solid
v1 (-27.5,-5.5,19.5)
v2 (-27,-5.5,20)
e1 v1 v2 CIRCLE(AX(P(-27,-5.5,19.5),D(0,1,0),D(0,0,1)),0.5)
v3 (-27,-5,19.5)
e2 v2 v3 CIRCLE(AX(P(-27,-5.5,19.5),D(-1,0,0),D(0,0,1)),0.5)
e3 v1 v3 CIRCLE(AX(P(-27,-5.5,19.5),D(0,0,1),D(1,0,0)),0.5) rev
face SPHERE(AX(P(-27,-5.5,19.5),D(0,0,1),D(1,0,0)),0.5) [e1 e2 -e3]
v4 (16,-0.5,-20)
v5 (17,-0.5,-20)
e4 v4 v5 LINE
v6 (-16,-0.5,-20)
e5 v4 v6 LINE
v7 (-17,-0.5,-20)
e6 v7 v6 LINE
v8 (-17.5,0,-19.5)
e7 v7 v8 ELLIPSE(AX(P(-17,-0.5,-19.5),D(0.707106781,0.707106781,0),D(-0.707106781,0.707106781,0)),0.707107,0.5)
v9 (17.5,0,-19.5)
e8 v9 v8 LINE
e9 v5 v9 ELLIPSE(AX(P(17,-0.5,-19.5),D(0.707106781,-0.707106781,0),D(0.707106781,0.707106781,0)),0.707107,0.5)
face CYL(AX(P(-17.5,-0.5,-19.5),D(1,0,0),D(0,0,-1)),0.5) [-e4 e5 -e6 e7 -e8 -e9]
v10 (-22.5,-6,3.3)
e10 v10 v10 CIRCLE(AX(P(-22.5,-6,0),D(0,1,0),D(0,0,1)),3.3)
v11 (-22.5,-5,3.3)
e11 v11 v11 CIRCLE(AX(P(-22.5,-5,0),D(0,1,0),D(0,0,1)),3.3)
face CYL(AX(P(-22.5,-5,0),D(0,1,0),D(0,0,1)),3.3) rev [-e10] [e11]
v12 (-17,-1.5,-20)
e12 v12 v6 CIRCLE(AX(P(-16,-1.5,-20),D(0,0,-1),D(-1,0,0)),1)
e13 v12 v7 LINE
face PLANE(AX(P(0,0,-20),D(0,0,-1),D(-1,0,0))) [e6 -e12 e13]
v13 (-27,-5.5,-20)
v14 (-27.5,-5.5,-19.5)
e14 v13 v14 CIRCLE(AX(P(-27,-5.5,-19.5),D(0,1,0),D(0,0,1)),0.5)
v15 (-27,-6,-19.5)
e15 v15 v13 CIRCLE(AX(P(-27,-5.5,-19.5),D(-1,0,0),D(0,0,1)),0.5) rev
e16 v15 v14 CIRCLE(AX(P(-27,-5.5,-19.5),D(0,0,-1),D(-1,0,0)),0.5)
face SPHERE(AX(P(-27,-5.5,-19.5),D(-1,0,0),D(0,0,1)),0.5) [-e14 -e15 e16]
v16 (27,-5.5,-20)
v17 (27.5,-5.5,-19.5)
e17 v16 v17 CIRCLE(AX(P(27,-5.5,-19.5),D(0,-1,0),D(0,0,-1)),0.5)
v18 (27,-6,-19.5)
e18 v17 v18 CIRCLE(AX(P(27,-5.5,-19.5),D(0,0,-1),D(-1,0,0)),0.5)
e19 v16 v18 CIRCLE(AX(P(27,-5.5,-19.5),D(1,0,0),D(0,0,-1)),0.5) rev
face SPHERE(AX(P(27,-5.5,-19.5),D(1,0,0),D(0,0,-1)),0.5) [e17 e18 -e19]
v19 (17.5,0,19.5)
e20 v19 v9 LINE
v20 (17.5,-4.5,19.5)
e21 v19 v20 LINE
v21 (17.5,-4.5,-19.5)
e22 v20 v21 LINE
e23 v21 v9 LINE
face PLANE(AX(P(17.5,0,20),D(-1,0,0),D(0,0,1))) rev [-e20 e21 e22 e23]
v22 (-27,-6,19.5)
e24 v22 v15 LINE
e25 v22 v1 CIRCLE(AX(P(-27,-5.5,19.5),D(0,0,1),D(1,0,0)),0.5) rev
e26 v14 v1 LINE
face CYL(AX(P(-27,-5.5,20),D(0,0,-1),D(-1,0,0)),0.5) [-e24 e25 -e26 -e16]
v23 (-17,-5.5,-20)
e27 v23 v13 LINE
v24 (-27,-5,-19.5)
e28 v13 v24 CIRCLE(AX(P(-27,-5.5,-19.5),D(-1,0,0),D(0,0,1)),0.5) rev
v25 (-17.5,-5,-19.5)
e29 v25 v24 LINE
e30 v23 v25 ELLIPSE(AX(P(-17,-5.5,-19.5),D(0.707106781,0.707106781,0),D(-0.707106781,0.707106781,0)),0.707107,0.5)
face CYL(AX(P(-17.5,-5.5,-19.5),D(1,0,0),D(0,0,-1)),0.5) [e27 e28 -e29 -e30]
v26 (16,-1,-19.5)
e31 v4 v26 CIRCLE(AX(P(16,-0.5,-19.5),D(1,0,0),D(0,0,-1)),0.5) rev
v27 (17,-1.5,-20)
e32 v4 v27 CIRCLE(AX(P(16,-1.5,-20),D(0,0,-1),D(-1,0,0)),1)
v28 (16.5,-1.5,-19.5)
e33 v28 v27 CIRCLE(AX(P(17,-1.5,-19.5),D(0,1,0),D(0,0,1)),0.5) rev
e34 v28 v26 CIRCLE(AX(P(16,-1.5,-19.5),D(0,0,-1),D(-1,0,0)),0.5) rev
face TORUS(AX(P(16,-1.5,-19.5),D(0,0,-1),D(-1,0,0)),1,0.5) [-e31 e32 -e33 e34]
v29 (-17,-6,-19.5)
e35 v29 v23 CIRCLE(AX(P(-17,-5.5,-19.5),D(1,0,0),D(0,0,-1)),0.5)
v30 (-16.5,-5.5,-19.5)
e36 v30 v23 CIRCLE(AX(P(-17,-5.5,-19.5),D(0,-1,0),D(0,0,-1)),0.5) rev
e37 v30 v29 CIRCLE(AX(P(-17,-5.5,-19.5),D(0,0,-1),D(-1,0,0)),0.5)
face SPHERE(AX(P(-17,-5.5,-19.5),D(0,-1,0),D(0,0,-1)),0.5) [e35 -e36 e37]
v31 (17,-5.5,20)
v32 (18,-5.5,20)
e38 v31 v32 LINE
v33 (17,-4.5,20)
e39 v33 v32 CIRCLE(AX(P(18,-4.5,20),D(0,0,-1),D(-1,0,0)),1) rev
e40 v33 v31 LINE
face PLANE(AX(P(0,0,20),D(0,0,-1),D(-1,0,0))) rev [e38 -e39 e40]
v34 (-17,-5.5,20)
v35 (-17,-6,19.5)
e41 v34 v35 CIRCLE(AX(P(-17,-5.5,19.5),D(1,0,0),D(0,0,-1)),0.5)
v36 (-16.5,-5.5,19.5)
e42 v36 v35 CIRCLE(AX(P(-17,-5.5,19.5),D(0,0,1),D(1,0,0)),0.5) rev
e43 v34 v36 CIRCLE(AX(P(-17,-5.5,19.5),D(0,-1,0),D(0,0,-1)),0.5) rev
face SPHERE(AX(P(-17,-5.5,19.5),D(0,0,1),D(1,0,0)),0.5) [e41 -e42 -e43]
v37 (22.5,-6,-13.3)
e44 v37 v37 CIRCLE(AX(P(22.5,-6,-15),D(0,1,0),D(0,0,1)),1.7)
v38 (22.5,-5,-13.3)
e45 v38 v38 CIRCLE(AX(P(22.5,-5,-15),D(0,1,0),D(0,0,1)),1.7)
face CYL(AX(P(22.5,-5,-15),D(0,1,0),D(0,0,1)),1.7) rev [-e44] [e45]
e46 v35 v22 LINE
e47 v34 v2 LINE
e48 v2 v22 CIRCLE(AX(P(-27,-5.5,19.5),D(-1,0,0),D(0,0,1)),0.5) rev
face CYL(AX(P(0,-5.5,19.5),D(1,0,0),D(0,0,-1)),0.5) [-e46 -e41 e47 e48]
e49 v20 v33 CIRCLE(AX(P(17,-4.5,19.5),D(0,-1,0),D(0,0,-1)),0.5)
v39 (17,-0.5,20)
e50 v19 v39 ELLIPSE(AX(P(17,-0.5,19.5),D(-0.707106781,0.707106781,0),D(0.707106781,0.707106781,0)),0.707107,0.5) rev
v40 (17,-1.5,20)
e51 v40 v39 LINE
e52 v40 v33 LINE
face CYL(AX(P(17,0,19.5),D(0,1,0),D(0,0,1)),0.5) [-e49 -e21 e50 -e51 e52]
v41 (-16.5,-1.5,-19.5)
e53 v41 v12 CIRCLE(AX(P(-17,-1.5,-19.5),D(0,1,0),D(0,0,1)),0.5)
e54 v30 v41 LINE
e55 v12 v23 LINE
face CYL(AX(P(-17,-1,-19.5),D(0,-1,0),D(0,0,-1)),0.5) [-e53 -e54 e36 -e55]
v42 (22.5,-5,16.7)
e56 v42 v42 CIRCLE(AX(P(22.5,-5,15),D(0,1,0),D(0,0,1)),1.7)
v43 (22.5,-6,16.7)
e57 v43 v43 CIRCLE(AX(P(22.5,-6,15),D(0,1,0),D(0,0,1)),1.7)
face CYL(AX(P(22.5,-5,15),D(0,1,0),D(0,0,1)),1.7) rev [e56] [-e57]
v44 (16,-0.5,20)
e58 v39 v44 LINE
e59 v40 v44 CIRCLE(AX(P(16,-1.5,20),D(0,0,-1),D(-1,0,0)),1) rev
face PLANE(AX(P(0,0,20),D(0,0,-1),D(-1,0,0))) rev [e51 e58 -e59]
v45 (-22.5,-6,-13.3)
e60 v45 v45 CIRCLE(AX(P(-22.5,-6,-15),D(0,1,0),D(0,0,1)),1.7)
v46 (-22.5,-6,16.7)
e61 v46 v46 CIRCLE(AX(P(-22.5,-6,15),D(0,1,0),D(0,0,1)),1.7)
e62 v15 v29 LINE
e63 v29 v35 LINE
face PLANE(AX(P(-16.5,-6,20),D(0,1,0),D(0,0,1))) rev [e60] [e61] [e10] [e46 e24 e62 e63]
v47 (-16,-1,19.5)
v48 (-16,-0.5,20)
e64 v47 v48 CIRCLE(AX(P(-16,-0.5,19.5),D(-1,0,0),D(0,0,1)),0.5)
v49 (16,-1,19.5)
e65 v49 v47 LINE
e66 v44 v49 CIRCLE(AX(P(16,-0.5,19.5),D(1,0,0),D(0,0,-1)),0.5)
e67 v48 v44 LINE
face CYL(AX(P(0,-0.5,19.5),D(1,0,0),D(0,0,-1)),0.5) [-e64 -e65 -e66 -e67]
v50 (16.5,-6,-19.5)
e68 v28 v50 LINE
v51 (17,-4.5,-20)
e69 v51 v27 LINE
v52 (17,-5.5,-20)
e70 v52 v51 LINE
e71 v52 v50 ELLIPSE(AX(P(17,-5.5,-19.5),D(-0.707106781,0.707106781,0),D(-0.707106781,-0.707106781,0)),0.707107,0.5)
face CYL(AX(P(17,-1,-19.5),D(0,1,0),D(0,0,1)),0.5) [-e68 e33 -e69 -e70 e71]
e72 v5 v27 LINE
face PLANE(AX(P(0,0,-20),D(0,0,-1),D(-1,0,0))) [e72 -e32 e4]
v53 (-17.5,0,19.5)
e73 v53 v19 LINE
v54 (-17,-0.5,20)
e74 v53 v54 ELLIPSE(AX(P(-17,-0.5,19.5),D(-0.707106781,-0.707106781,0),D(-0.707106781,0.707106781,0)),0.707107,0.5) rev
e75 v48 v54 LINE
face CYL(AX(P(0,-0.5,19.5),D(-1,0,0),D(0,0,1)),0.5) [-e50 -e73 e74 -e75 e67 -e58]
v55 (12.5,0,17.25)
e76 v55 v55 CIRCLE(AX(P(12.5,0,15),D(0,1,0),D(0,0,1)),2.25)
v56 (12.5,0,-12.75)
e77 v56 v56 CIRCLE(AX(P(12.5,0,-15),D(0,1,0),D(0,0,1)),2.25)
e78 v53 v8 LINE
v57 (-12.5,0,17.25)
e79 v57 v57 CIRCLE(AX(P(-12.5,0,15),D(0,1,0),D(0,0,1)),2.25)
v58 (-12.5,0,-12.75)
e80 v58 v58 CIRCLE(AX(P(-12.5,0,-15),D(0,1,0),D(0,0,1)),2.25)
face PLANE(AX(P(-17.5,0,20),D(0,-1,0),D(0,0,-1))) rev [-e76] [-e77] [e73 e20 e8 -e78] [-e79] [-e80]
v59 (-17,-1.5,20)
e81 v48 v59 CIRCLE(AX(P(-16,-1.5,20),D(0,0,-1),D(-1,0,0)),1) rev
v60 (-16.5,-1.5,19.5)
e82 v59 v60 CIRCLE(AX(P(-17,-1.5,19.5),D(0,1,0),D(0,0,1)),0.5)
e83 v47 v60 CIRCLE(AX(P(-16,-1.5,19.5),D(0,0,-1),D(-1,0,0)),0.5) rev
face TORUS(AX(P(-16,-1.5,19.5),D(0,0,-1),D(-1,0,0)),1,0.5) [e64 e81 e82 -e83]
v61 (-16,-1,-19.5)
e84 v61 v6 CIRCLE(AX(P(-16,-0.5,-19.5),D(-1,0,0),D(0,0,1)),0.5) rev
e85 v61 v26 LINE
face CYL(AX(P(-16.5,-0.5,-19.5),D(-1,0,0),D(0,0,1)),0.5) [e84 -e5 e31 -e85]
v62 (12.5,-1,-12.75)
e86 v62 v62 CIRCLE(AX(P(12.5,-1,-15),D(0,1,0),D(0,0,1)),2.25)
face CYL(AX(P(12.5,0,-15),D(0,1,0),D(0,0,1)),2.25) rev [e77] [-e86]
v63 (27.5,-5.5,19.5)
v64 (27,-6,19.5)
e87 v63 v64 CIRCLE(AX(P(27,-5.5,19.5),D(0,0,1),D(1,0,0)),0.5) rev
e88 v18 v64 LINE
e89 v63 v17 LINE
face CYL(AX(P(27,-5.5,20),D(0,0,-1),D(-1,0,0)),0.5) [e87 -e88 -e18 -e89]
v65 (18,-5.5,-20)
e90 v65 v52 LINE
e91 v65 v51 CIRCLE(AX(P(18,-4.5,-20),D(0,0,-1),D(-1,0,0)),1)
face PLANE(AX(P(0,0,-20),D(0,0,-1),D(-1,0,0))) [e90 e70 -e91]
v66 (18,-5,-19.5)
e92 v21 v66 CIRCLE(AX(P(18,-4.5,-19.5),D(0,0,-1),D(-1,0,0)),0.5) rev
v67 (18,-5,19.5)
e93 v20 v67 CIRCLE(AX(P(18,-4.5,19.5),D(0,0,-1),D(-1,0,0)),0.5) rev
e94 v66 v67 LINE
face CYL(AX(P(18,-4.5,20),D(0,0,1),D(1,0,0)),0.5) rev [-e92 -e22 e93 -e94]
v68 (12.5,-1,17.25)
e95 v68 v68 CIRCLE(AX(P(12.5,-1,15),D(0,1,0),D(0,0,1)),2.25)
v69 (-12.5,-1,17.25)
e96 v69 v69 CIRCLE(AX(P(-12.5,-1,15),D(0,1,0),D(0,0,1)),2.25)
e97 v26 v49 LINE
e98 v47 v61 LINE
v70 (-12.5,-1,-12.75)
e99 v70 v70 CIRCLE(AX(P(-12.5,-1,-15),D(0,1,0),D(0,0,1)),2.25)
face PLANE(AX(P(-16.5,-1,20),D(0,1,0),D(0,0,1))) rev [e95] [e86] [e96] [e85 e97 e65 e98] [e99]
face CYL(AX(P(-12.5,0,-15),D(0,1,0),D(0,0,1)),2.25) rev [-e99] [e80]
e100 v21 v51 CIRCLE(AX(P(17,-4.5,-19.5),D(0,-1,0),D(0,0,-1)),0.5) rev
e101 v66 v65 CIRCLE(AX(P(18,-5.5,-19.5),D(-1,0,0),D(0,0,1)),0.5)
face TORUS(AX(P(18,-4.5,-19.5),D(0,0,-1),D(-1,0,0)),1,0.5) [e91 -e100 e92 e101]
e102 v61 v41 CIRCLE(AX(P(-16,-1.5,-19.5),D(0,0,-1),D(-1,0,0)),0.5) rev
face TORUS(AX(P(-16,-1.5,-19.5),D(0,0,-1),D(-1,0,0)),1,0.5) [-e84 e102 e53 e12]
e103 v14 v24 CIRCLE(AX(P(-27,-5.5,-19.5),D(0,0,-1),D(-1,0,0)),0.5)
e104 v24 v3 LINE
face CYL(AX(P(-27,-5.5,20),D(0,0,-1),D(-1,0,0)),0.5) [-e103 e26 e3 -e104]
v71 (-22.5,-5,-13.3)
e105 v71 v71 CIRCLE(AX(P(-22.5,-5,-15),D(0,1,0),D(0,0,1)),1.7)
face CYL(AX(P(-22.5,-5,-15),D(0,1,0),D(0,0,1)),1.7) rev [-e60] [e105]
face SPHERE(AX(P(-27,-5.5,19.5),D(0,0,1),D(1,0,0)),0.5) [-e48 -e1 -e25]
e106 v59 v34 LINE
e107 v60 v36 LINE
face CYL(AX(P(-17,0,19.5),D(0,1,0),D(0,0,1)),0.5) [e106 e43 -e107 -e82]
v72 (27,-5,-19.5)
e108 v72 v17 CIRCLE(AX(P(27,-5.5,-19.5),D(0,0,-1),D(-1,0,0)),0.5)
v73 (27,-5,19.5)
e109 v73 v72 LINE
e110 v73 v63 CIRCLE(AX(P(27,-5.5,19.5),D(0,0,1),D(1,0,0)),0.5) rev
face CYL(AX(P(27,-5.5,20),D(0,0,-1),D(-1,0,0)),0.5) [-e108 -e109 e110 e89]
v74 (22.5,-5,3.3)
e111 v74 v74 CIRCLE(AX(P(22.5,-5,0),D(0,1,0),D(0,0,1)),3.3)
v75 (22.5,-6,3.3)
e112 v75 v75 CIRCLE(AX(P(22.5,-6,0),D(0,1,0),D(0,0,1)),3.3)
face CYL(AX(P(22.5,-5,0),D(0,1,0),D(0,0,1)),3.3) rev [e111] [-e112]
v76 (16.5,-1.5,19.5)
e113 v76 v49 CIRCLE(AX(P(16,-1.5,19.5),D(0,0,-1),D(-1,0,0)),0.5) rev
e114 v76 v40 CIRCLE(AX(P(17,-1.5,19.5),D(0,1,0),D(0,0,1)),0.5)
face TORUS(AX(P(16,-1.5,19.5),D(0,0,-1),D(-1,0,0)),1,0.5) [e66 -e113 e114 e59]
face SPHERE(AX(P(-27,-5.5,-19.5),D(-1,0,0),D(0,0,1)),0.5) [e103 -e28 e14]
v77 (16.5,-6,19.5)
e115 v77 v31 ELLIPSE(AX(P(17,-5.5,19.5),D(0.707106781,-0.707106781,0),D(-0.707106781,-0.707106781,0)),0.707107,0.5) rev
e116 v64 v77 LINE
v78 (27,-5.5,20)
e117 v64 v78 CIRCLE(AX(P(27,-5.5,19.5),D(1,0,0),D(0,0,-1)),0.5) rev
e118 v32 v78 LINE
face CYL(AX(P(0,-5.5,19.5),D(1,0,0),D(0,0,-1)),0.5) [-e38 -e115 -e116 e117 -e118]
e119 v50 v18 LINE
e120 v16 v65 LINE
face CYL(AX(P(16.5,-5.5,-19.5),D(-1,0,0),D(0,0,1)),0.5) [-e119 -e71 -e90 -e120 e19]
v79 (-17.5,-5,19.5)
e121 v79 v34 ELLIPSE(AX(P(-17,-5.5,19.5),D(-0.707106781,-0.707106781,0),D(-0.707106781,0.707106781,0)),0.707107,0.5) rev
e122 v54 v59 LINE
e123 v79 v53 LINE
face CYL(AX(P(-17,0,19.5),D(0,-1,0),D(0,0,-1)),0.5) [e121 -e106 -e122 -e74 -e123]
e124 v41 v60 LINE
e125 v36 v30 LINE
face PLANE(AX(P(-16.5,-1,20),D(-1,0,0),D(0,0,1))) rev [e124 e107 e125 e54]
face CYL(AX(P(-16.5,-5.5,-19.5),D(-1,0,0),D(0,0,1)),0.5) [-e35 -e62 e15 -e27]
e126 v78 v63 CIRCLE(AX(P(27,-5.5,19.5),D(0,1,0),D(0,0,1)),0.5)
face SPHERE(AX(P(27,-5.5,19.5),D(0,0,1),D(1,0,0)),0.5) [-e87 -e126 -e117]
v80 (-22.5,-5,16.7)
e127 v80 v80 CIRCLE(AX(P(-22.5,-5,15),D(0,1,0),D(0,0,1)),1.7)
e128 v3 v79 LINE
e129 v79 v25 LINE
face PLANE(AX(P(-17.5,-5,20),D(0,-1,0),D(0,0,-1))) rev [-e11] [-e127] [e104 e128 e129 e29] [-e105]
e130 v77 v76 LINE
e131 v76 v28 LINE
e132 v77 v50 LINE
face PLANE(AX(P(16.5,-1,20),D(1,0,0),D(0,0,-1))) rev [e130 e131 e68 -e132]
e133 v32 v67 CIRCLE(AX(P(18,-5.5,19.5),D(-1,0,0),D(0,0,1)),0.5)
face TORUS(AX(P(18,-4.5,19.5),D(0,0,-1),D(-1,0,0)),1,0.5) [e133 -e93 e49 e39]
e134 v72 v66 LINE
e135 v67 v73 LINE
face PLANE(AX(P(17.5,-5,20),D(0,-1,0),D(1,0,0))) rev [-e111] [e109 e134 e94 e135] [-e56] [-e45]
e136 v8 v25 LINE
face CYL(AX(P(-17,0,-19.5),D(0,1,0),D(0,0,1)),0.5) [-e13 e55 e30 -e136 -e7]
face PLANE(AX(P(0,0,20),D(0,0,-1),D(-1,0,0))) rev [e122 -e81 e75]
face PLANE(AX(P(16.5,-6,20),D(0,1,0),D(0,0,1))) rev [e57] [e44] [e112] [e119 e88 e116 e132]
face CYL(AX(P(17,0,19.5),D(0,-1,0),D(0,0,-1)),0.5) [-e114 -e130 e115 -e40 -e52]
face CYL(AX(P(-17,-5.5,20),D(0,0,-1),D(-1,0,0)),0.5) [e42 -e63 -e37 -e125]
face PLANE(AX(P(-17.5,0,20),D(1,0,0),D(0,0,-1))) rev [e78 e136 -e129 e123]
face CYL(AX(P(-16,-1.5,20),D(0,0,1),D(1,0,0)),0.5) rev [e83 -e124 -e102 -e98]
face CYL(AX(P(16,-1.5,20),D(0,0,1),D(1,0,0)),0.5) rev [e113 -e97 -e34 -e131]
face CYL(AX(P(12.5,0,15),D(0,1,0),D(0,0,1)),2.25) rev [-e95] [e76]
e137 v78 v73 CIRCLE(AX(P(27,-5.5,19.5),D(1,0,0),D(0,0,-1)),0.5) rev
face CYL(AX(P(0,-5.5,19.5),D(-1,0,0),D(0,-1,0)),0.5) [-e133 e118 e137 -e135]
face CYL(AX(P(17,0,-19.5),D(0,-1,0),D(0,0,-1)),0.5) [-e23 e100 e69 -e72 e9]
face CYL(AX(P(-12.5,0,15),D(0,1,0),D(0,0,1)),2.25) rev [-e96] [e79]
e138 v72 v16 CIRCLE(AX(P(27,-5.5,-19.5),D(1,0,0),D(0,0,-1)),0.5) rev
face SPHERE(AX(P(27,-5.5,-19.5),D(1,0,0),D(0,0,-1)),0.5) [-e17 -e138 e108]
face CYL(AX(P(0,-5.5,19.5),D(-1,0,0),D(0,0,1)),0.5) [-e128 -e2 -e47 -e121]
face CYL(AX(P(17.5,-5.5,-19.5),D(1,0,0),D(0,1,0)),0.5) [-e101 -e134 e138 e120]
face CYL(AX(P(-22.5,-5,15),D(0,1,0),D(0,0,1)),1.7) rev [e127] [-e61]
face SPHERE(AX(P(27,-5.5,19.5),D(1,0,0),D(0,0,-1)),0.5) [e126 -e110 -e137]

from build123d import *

# Parameters (mm, degrees)
BOSS_EXTRUDE1_DEPTH  = 20
FILLET1_R            = 0.5
M6_CLEARANCE_HOLE1_D = 6.6
M4_CLEARANCE_HOLE1_D = 4.5
M3_CLEARANCE_HOLE1_D = 3.4
MIRROR2_COPY_1_D     = 4.5
MIRROR2_COPY_2_D     = 3.4


with BuildPart() as part:
    # Sketch1 → Boss-Extrude1 (new, symmetric)
    with BuildSketch(Plane.XY):
        Polygon((-17.5, 0), (17.5, 0), (17.5, -5), (27.5, -5), (27.5, -6), (16.5, -6), (16.5, -1), (-16.5, -1), (-16.5, -6), (-27.5, -6), (-27.5, -5), (-17.5, -5), align=None)
    extrude(amount=BOSS_EXTRUDE1_DEPTH, both=True)

    # Fillet1
    fillet1_edges = [part.edges().sort_by_distance(p)[0] for p in [
        (27.5, -5.5, -20),
        (22, -6, -20),
        (0, 0, 20),
        (16.5, -3.5, -20),
        (0, -1, -20),
        (-16.5, -3.5, -20),
        (-22, -6, -20),
        (-27.5, -5.5, -20),
        (-22.5, -5, -20),
        (-17.5, -2.5, -20),
        (0, 0, -20),
        (17.5, -2.5, -20),
        (22.5, -5, -20),
        (-17.5, -2.5, 20),
        (27.5, -5, 0),
        (27.5, -6, 0),
        (-22.5, -5, 20),
        (16.5, -1, 0),
        (-16.5, -1, 0),
        (-16.5, -6, 0),
        (-27.5, -6, 0),
        (-27.5, -5, 0),
        (17.5, -5, 0),
        (-27.5, -5.5, 20),
        (-22, -6, 20),
        (-16.5, -3.5, 20),
        (0, -1, 20),
        (16.5, -3.5, 20),
        (22, -6, 20),
        (27.5, -5.5, 20),
        (22.5, -5, 20),
        (17.5, -2.5, 20),
    ]]
    fillet(fillet1_edges, radius=FILLET1_R - 0.0001)  # a hair under: the kernel refuses the full size

    # M6 Clearance Hole1 (through all)
    with Locations(Plane(origin=(0, -5, 0), x_dir=(1, 0, 0), z_dir=(0, 1, 0))):
        with Locations((-22.5, 0), (22.5, 0)):
            Hole(M6_CLEARANCE_HOLE1_D / 2)

    # M4 Clearance Hole1 (through all)
    with Locations(Plane(origin=(0, 0, 0), x_dir=(1, 0, 0), z_dir=(0, 1, 0))):
        with Locations((-12.5, 15)):
            m4_clearance_hole1 = Hole(M4_CLEARANCE_HOLE1_D / 2)

    # M3 Clearance Hole1 (through all)
    with Locations(Plane(origin=(0, -5, 0), x_dir=(1, 0, 0), z_dir=(0, 1, 0))):
        with Locations((-22.5, 15)):
            m3_clearance_hole1 = Hole(M3_CLEARANCE_HOLE1_D / 2)

    # Mirror1: M4 Clearance Hole1, M3 Clearance Hole1 across plane
    add(m4_clearance_hole1.mirror(Plane(origin=(0, 0, 0), x_dir=(0, 0, 1), z_dir=(1, 0, 0))), mode=Mode.SUBTRACT)
    add(m3_clearance_hole1.mirror(Plane(origin=(0, 0, 0), x_dir=(0, 0, 1), z_dir=(1, 0, 0))), mode=Mode.SUBTRACT)

    # Mirror2: M4 Clearance Hole1, M3 Clearance Hole1 across plane
    add(m4_clearance_hole1.mirror(Plane.XY), mode=Mode.SUBTRACT)
    add(m3_clearance_hole1.mirror(Plane.XY), mode=Mode.SUBTRACT)

    # Mirror2 copy 1 (through all)
    with Locations(Plane(origin=(0, 0, 0), x_dir=(-1, 0, 0), z_dir=(0, 1, 0))):
        with Locations((-12.5, 15)):
            Hole(MIRROR2_COPY_1_D / 2)

    # Mirror2 copy 2 (through all)
    with Locations(Plane(origin=(0, -5, 0), x_dir=(-1, 0, 0), z_dir=(0, 1, 0))):
        with Locations((-22.5, 15)):
            Hole(MIRROR2_COPY_2_D / 2)


solid = part.part
